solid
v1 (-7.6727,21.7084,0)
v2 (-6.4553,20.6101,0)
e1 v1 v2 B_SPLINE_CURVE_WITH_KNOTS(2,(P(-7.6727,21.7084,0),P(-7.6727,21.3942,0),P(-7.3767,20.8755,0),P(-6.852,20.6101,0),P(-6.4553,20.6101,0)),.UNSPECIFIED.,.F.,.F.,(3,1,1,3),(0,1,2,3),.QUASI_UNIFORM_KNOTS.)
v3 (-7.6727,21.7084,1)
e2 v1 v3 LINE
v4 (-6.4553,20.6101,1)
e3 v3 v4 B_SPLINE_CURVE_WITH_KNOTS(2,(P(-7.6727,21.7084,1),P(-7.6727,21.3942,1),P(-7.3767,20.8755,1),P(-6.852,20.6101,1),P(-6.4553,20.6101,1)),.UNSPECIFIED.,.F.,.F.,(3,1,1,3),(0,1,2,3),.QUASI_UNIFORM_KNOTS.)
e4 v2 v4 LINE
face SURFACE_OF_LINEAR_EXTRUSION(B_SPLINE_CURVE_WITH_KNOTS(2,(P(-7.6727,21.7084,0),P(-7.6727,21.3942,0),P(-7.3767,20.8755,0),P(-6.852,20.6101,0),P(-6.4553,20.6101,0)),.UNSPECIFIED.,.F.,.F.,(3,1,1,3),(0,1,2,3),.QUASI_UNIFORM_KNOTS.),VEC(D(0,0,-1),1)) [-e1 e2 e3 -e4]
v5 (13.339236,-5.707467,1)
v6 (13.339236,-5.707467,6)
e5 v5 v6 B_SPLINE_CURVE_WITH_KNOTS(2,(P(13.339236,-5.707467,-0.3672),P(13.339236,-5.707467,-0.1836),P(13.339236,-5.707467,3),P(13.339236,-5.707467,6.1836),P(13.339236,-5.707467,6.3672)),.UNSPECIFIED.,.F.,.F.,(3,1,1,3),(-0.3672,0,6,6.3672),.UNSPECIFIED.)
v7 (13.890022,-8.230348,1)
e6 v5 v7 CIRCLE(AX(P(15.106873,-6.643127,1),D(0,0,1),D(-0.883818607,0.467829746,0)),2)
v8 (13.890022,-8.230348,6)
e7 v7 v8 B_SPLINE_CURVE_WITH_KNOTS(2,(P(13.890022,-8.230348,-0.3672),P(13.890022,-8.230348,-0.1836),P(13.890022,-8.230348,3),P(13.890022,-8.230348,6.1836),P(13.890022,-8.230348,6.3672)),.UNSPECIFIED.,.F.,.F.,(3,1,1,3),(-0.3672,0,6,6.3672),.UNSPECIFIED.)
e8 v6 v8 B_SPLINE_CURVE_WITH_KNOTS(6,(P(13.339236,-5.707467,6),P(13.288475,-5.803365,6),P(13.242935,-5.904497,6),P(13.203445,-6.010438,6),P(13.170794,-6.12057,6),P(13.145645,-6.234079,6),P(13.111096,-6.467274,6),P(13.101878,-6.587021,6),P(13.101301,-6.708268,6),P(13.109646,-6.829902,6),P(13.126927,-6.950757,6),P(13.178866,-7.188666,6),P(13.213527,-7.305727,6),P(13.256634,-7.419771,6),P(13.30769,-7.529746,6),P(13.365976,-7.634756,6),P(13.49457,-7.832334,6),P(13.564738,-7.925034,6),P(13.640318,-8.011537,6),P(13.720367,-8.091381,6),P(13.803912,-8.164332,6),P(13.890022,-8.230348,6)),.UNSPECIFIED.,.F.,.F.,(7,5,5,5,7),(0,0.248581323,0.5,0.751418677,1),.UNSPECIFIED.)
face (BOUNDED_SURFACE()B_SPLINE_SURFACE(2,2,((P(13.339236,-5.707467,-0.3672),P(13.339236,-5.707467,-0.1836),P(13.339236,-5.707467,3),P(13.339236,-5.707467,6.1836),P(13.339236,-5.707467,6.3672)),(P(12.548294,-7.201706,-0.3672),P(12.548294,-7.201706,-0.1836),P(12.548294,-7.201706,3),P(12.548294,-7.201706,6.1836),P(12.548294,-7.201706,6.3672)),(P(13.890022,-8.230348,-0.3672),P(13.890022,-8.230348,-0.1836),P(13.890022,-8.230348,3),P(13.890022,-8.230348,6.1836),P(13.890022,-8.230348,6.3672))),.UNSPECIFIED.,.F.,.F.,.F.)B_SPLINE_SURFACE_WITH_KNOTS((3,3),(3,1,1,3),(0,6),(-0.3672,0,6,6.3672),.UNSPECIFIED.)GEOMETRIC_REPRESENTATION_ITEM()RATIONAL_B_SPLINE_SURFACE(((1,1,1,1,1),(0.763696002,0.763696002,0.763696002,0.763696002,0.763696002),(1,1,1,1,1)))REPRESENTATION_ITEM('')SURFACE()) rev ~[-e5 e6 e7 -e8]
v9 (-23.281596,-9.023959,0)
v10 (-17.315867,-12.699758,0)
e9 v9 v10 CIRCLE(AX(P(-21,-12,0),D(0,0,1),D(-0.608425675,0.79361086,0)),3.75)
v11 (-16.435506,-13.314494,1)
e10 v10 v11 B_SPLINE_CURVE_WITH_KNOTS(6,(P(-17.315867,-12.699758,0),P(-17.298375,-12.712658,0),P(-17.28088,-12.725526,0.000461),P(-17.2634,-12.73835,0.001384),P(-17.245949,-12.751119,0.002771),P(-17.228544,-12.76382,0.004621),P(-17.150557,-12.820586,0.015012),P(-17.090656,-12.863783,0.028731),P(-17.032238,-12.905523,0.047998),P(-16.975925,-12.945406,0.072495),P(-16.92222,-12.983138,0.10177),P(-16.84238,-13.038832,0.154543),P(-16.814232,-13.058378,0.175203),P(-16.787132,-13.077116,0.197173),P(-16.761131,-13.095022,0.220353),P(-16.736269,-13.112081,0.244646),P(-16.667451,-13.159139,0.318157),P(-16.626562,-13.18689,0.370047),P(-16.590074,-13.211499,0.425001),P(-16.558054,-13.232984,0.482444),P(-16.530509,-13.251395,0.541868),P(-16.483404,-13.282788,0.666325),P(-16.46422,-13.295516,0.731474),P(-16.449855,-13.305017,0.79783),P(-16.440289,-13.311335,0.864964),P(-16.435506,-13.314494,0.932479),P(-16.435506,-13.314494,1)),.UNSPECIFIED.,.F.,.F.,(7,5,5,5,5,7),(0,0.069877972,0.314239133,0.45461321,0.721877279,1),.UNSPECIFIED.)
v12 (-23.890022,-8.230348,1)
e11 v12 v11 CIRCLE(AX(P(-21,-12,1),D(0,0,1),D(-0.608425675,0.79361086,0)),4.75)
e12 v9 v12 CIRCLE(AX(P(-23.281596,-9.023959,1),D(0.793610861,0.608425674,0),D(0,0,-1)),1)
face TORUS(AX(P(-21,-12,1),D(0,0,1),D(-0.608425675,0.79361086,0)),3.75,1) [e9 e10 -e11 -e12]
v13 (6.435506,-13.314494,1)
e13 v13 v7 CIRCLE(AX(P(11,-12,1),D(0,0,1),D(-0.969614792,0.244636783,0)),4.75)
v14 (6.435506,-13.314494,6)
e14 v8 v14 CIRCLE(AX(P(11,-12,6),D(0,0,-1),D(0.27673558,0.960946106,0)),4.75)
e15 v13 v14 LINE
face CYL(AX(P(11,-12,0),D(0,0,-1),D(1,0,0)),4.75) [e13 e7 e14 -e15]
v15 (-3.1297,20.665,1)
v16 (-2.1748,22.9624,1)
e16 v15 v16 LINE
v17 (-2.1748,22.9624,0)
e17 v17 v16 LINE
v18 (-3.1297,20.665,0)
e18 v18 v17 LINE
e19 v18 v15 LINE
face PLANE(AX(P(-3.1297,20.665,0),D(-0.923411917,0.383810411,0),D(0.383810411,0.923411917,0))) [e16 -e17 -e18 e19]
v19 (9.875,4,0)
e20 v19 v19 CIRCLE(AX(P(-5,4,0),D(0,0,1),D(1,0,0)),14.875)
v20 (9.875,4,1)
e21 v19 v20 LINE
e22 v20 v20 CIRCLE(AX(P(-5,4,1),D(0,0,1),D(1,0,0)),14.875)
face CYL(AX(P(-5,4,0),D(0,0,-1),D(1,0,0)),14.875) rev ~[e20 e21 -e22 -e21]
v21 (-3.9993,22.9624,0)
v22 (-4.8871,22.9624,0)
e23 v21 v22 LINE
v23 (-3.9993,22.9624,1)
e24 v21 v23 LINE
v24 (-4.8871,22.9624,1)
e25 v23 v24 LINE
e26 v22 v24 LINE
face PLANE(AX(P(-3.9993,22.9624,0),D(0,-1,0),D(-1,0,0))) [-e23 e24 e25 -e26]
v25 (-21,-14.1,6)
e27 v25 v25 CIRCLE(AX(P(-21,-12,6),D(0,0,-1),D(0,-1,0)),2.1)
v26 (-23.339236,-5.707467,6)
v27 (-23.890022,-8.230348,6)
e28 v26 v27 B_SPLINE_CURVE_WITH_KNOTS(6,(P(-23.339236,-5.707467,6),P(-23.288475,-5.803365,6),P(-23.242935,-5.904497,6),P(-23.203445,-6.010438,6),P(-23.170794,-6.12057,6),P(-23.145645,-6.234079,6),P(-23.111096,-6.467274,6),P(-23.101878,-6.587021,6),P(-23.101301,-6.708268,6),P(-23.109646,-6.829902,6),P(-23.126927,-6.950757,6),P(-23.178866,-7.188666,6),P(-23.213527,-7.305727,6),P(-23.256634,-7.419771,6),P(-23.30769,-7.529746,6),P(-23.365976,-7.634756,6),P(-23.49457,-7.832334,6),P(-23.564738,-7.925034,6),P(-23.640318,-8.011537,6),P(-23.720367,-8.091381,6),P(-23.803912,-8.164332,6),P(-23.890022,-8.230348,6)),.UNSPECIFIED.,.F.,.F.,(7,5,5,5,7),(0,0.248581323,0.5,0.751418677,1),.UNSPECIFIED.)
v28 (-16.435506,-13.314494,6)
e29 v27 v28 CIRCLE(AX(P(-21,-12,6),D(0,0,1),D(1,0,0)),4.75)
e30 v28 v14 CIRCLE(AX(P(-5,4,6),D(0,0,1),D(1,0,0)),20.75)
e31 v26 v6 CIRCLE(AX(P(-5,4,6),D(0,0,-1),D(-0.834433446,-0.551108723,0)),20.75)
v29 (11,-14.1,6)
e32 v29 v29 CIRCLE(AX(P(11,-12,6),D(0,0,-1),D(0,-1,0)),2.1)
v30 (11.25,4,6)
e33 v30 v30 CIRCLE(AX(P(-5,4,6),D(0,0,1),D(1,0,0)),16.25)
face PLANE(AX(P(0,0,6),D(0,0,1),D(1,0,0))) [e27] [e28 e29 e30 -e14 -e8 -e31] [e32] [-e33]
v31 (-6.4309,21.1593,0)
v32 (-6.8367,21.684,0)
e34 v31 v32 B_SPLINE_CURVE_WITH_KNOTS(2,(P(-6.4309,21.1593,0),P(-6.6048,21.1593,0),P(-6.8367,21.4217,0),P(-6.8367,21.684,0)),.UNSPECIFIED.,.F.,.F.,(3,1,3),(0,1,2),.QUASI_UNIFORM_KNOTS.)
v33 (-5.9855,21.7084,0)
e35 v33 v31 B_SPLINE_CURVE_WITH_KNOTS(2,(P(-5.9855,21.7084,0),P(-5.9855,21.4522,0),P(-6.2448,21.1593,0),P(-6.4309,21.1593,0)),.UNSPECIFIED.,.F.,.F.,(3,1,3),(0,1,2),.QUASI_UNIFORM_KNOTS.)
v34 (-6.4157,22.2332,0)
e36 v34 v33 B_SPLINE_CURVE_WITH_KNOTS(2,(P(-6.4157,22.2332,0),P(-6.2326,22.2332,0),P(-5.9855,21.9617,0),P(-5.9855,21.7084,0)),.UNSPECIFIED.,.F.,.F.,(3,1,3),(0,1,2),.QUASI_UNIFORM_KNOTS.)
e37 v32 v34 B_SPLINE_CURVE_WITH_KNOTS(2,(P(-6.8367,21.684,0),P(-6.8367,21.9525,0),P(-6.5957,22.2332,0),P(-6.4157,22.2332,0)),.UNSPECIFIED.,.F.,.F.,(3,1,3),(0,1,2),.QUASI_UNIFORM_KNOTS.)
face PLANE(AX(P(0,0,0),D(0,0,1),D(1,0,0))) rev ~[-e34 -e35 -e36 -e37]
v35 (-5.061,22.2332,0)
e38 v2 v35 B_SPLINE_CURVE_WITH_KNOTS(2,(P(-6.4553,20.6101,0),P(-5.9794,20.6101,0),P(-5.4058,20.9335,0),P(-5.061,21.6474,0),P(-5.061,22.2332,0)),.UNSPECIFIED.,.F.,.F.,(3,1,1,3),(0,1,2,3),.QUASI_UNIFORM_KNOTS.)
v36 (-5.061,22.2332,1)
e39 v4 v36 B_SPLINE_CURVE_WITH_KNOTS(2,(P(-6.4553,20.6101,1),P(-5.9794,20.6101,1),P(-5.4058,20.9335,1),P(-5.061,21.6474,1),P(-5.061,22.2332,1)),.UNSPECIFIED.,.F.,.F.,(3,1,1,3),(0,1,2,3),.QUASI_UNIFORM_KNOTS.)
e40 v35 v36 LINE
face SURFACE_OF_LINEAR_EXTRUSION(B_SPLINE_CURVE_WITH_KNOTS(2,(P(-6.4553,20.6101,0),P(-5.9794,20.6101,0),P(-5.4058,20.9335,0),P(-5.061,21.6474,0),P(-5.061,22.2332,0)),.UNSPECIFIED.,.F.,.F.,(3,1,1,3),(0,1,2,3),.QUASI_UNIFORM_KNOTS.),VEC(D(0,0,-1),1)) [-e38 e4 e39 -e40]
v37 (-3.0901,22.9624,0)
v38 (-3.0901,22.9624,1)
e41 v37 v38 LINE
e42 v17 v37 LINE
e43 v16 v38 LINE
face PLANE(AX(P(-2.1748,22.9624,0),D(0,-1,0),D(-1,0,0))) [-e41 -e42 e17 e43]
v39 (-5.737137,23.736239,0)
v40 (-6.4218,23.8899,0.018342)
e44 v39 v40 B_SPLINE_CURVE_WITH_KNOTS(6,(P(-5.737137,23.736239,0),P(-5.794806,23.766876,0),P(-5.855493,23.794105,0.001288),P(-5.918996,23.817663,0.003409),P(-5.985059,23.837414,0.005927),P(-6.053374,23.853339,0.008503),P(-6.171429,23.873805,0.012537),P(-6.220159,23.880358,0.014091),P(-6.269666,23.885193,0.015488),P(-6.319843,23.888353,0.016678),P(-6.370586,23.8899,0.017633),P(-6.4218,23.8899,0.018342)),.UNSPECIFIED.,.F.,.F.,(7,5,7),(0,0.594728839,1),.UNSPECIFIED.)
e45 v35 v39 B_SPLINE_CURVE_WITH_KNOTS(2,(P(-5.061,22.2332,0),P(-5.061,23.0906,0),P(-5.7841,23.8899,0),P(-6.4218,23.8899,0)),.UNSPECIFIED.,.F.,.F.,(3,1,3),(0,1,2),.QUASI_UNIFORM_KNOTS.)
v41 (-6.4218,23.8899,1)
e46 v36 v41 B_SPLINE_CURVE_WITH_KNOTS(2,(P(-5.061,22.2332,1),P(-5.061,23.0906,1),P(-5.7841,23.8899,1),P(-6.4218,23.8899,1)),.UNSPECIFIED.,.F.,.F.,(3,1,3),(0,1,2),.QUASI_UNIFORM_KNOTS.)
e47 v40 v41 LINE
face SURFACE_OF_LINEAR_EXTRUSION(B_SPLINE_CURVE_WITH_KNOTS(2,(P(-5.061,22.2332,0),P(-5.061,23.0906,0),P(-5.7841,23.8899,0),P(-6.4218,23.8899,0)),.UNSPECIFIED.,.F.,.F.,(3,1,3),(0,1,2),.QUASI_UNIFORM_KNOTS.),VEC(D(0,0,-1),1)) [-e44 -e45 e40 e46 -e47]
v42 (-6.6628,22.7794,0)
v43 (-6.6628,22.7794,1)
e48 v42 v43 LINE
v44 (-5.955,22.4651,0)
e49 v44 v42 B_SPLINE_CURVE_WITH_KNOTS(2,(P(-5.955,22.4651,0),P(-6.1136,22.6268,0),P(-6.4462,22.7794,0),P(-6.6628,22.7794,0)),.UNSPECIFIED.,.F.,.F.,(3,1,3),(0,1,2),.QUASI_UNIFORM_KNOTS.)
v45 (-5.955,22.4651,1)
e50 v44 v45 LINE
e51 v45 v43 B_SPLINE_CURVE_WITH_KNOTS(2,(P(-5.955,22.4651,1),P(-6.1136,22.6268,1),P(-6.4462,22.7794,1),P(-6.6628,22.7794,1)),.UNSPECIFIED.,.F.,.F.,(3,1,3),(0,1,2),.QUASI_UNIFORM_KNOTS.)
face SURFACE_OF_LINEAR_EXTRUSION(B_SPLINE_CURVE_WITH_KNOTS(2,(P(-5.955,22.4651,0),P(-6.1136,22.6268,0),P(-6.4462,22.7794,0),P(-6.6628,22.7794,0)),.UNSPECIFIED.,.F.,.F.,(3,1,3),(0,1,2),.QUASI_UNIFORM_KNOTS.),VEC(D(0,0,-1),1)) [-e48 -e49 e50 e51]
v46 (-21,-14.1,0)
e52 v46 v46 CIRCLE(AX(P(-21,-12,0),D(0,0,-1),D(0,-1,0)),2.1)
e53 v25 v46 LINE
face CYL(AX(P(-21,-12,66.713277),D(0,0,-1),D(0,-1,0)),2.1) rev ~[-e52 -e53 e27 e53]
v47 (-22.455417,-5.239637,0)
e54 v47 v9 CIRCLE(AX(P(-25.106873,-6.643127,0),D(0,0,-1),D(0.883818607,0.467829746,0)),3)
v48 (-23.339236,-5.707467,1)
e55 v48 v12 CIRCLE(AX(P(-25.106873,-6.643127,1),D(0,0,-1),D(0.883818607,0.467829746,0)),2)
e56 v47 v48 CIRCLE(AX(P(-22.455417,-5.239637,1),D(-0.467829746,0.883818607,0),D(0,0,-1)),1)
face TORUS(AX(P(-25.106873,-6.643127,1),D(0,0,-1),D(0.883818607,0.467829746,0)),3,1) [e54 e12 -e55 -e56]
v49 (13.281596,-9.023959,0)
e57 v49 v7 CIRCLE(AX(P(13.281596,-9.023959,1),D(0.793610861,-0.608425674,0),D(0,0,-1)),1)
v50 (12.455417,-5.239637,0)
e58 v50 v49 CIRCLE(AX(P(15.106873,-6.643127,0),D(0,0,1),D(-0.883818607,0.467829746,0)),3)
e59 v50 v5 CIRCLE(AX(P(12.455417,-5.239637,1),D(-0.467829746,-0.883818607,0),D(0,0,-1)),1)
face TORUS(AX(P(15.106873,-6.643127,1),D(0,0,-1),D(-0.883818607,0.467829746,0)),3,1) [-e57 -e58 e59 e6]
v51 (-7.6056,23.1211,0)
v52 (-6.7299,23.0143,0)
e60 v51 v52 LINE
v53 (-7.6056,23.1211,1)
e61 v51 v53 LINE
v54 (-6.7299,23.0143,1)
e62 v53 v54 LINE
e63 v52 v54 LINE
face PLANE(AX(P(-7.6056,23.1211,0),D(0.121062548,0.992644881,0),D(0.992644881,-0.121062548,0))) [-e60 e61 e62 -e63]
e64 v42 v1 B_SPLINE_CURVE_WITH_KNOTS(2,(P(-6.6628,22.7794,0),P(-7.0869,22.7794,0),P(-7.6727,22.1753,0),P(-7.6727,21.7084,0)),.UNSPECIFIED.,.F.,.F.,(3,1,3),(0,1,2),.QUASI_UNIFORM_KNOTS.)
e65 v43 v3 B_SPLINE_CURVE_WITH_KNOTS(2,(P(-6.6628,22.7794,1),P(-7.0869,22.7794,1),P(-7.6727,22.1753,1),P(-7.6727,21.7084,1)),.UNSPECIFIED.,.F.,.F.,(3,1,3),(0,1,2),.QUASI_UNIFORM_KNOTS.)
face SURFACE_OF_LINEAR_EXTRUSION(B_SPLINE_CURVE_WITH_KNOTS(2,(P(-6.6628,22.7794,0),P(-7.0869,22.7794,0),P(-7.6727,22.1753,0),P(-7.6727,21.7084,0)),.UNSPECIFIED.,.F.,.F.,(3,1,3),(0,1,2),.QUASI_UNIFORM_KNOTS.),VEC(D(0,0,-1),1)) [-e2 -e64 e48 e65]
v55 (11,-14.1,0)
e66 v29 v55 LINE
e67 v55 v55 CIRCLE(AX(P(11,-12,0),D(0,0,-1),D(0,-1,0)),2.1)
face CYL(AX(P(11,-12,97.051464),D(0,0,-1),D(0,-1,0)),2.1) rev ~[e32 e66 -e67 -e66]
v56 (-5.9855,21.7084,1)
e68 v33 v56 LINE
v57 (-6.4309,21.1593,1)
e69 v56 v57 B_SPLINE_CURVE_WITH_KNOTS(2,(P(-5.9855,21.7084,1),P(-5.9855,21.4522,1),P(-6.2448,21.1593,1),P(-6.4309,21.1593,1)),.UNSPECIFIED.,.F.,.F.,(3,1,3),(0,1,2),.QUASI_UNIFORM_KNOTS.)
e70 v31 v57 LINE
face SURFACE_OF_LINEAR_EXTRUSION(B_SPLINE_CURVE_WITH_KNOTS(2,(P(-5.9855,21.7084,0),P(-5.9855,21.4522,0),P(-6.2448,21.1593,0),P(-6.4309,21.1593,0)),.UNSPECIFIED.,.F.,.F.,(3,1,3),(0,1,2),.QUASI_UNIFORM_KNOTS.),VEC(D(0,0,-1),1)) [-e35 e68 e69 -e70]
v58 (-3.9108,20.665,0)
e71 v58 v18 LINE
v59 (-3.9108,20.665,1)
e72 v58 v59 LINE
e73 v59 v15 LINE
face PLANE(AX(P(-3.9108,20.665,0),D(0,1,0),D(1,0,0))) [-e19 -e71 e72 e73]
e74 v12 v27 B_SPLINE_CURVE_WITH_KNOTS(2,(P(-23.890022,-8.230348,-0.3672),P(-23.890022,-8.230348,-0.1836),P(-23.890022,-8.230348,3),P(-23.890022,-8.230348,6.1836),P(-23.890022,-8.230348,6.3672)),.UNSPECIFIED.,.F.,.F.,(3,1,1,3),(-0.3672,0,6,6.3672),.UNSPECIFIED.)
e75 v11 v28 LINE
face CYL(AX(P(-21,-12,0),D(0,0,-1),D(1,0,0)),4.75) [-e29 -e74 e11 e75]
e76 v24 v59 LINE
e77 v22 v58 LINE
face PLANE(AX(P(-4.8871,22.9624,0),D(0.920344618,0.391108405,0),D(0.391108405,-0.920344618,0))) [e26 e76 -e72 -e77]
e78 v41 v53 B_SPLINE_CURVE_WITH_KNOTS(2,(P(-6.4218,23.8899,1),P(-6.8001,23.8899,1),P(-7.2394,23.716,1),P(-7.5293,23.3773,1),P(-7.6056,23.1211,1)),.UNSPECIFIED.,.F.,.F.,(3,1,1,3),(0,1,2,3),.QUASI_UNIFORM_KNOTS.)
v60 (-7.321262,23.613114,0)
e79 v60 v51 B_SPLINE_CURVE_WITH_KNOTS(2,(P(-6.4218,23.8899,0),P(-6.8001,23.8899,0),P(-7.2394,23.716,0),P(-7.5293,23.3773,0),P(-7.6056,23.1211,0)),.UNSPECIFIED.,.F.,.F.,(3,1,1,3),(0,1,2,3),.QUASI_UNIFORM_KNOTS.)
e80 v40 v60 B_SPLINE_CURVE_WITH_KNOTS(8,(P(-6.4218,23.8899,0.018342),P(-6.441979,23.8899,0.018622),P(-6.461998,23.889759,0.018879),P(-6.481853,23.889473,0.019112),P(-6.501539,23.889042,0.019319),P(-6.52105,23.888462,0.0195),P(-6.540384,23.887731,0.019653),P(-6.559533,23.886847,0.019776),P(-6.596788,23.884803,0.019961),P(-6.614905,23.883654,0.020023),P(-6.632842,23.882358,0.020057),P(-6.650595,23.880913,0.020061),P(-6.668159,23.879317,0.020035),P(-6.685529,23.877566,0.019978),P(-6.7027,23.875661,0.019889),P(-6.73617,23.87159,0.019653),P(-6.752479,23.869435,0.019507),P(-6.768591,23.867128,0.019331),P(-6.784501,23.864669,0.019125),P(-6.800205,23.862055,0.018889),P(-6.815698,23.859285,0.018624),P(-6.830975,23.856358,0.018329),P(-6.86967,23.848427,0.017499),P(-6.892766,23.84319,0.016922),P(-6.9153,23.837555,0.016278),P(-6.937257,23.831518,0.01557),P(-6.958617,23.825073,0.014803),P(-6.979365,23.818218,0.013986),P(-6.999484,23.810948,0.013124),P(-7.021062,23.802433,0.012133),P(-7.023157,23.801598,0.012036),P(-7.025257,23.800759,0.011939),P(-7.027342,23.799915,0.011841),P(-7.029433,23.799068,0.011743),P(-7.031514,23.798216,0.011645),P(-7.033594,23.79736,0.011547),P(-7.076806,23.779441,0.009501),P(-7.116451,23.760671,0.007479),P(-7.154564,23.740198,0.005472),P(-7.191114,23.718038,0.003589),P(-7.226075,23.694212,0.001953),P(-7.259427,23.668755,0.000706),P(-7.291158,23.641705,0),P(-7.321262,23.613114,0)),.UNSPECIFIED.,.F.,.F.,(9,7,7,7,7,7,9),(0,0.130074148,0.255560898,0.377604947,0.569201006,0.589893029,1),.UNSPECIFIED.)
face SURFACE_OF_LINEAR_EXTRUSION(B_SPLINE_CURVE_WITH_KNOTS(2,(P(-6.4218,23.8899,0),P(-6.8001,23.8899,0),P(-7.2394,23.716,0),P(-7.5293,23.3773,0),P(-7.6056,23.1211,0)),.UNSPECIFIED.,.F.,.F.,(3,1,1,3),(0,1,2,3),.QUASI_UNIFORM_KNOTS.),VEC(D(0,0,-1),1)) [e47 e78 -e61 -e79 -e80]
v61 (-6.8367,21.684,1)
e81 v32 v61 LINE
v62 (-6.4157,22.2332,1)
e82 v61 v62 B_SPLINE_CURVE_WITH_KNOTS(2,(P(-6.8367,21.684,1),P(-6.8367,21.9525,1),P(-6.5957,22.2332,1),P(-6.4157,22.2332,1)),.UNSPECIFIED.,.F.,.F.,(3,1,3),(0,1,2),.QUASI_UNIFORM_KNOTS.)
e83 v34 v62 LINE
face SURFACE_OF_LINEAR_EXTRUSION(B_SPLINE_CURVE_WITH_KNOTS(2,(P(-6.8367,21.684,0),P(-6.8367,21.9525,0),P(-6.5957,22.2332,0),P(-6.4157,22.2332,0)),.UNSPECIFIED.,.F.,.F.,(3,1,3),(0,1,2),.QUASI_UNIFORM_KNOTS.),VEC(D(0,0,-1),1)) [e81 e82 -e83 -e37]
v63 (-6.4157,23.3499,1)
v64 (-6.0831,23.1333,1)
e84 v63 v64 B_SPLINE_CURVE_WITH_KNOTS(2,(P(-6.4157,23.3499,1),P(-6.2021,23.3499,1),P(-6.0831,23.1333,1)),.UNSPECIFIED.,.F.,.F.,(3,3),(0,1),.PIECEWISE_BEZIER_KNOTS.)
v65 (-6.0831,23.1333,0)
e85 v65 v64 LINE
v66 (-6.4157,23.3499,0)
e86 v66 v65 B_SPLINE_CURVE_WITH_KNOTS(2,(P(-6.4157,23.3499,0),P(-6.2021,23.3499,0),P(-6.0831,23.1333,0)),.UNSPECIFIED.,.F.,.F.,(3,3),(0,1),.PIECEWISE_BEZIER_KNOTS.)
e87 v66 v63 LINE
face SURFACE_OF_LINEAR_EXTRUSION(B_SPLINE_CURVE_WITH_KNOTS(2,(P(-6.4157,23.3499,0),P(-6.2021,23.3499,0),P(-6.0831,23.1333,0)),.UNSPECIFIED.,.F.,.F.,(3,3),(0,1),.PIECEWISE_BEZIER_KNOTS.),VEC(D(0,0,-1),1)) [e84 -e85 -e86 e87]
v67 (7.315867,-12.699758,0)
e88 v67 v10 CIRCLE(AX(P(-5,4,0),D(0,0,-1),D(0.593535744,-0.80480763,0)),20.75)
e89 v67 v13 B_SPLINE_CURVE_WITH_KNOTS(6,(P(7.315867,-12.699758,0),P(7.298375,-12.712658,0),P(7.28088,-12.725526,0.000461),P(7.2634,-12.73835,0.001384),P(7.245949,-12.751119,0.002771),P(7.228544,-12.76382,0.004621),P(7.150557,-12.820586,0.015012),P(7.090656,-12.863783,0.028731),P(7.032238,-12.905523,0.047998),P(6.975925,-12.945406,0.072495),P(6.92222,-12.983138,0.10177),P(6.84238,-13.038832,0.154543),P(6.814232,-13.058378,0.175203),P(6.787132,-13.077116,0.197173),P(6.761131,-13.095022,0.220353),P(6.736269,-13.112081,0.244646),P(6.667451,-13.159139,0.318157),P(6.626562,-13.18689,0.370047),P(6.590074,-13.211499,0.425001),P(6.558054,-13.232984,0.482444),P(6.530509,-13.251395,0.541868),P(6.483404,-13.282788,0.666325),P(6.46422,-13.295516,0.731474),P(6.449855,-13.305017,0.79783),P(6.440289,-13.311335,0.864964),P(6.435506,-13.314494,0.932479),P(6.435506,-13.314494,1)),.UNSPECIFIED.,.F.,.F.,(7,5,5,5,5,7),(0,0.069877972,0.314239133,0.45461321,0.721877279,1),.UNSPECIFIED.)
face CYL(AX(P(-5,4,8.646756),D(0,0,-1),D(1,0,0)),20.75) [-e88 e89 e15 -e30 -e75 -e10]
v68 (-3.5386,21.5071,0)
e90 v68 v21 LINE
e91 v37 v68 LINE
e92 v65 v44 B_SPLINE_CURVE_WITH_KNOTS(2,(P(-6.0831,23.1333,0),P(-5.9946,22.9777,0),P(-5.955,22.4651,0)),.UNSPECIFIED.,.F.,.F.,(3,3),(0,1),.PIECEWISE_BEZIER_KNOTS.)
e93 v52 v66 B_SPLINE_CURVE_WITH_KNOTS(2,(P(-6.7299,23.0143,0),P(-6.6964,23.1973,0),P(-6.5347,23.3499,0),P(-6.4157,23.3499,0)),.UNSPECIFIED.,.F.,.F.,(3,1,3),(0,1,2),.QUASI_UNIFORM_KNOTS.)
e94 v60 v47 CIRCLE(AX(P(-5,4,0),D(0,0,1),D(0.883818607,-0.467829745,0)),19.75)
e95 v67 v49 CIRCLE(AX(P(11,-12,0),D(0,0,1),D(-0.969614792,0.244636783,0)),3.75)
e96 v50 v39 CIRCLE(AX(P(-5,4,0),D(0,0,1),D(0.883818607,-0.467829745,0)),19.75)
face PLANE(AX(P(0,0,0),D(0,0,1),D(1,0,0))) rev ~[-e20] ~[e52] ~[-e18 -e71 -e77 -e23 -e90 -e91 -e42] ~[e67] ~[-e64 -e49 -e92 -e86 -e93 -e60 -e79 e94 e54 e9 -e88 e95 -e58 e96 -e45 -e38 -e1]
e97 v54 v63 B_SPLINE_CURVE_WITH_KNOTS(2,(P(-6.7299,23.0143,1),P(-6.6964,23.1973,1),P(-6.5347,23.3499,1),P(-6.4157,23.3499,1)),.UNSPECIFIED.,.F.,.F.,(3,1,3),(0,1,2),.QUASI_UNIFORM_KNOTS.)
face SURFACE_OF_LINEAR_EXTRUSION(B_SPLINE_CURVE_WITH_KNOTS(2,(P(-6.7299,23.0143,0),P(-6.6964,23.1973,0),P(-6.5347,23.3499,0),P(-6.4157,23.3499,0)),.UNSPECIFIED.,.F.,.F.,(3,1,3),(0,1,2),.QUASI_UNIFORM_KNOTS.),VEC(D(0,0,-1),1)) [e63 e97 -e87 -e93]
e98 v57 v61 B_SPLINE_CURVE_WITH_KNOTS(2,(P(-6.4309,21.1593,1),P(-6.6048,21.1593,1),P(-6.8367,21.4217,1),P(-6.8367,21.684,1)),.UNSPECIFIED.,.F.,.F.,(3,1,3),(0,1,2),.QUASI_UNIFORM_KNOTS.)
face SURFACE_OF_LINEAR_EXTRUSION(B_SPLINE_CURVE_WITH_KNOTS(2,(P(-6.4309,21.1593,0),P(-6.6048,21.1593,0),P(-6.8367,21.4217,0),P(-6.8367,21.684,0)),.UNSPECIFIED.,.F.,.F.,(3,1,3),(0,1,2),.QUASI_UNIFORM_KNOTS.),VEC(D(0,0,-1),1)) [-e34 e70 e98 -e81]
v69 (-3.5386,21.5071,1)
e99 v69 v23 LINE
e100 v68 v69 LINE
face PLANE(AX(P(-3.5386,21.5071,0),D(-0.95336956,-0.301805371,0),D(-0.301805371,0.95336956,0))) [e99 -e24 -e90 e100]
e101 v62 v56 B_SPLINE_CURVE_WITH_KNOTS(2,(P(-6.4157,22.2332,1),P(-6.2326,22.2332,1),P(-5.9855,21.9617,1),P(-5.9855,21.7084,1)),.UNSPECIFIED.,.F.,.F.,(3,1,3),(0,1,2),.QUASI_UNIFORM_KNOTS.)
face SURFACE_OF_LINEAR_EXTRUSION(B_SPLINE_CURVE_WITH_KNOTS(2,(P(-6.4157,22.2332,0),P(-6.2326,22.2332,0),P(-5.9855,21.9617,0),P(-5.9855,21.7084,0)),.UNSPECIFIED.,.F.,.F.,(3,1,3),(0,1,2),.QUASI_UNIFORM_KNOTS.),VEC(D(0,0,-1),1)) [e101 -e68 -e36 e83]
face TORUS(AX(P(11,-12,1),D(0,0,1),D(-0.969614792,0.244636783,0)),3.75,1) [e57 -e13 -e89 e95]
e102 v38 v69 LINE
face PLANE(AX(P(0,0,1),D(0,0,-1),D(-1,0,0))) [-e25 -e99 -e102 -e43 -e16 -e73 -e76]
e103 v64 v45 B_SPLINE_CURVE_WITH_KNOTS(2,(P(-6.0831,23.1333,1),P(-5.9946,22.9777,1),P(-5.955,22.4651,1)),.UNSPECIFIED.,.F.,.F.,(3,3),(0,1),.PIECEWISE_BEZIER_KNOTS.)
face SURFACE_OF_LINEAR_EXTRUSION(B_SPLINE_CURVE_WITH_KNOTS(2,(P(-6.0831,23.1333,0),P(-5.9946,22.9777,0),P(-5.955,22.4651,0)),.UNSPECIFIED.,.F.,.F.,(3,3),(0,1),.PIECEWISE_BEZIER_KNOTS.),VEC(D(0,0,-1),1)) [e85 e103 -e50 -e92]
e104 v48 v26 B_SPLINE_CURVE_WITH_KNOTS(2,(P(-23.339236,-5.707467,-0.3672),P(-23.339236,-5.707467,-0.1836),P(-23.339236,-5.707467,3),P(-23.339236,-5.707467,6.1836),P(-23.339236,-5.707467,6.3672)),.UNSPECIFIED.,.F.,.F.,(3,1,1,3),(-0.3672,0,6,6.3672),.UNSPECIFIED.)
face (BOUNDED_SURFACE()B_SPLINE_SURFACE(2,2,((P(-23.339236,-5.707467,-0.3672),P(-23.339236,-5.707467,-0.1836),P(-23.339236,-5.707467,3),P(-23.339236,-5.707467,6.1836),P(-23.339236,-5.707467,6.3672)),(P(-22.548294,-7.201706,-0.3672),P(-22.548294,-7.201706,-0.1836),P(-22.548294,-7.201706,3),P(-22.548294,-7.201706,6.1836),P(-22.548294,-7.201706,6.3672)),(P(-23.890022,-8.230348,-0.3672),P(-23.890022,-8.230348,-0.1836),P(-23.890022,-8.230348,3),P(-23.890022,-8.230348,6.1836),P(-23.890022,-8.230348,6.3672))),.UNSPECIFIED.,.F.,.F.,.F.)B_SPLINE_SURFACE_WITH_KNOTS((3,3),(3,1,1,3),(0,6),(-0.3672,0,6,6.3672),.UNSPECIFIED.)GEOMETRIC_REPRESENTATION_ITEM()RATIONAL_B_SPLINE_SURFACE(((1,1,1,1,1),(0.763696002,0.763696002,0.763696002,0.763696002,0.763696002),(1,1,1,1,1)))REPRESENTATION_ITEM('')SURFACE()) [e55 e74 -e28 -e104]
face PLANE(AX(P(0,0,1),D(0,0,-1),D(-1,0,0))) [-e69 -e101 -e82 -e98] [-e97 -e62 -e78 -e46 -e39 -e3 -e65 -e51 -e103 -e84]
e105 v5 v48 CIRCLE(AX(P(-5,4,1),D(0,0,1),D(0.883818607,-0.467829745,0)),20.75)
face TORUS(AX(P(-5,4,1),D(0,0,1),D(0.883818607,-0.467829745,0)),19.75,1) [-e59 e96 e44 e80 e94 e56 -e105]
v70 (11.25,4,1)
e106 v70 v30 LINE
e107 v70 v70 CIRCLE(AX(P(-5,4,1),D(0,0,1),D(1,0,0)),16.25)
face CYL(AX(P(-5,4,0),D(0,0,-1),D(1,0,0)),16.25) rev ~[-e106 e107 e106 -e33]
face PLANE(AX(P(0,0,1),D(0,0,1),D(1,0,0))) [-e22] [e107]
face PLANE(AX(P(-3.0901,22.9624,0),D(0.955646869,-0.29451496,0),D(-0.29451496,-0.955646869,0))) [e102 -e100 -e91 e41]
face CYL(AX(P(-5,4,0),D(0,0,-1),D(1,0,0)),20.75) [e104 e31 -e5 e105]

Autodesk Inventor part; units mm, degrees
ref_plane "YZ Plane" through (0, 0, 0) normal (1, 0, 0) x (0, 1, 0)
ref_plane "XZ Plane" through (0, 0, 0) normal (0, 1, 0) x (-1, 0, 0)
sketch "Sketch1: base" plane through (0, 0, 0) normal (0, 0, 1) x (1, 0, 0)
  circle A0 centre (-5, 4) radius 16.25
  circle A1 centre (-5, 4) radius 20.75
  circle A2 centre (-21, -12) radius 4.75
  circle A3 centre (11, -12) radius 4.75
  line L0 (-21, -12) -> (11, -12) construction
  line L1 (-21, 20) -> (-21, -12) construction
  point P0 (0, 0)
  point P1 (-5, -12)
  point P2 (-21, 4)
  point P3 (-22.3145, -7.4355)
  point P4 (-16.4355, -13.3145)
  point P5 (6.4355, -13.3145)
  point P6 (12.3145, -7.4355)
  dimension "d0" = 9.5
  dimension "d1" = 32
  dimension "d2" = 41.5
  dimension "d3" = 32.5
  dimension "d4" = 32
sketch "Sketch2: tube stopper" plane through (0, 0, 0) normal (0, 0, 1) x (1, 0, 0)
  circle A0 centre (-5, 4) radius 14.875
  circle A1 centre (-5, 4) radius 16.25 projected
  point P0 (0, 0)
  dimension "d14" = 29.75
extrude "Ex1: base" add sketch "Sketch1: base" along normal blind 6
ref_plane "Work Plane1" through (0, 0, 0) normal (0, 0, 1) x (1, 0, 0)
sketch "Sketch: text" plane through (0, 0, 0) normal (0, 0, -1) x (-1, 0, 0)
  line L0 (3.25, 24) -> (6.75, 24) construction
  line L1 (6.75, 24) -> (6.75, 20.5) construction
  line L2 (6.75, 20.5) -> (3.25, 20.5) construction
  line L3 (3.25, 20.5) -> (3.25, 24) construction
  line L4 (2.1748, 22.9624) -> (3.0901, 22.9624)
  line L5 (3.0901, 22.9624) -> (3.5386, 21.5071)
  line L6 (3.5386, 21.5071) -> (3.9993, 22.9624)
  line L7 (3.9993, 22.9624) -> (4.8871, 22.9624)
  line L8 (4.8871, 22.9624) -> (3.9108, 20.665)
  line L9 (3.9108, 20.665) -> (3.1297, 20.665)
  line L10 (3.1297, 20.665) -> (2.1748, 22.9624)
  line L11 (7.6056, 23.1211) -> (6.7299, 23.0143)
  spline S0 degree 2 poles (6.7299, 23.0143) (6.6964, 23.1973) (6.5347, 23.3499) (6.4157, 23.3499) knots 0 0 0 1 2 2 2
  spline S1 degree 2 poles (6.4157, 23.3499) (6.2021, 23.3499) (6.0831, 23.1333) knots 0 0 0 1 1 1
  spline S2 degree 2 poles (6.0831, 23.1333) (5.9946, 22.9777) (5.955, 22.4651) knots 0 0 0 1 1 1
  spline S3 degree 2 poles (5.955, 22.4651) (6.1136, 22.6268) (6.4462, 22.7794) (6.6628, 22.7794) knots 0 0 0 1 2 2 2
  spline S4 degree 2 poles (6.6628, 22.7794) (7.0869, 22.7794) (7.6727, 22.1753) (7.6727, 21.7084) knots 0 0 0 1 2 2 2
  spline S5 degree 2 poles (7.6727, 21.7084) (7.6727, 21.3942) (7.3767, 20.8755) (6.852, 20.6101) (6.4553, 20.6101) knots 0 0 0 1 2 3 3 3
  spline S6 degree 2 poles (6.4553, 20.6101) (5.9794, 20.6101) (5.4058, 20.9335) (5.061, 21.6474) (5.061, 22.2332) knots 0 0 0 1 2 3 3 3
  spline S7 degree 2 poles (5.061, 22.2332) (5.061, 23.0906) (5.7841, 23.8899) (6.4218, 23.8899) knots 0 0 0 1 2 2 2
  spline S8 degree 2 poles (6.4218, 23.8899) (6.8001, 23.8899) (7.2394, 23.716) (7.5293, 23.3773) (7.6056, 23.1211) knots 0 0 0 1 2 3 3 3
  spline S9 degree 2 poles (5.9855, 21.7084) (5.9855, 21.4522) (6.2448, 21.1593) (6.4309, 21.1593) knots 0 0 0 1 2 2 2
  spline S10 degree 2 poles (6.4309, 21.1593) (6.6048, 21.1593) (6.8367, 21.4217) (6.8367, 21.684) knots 0 0 0 1 2 2 2
  spline S11 degree 2 poles (6.8367, 21.684) (6.8367, 21.9525) (6.5957, 22.2332) (6.4157, 22.2332) knots 0 0 0 1 2 2 2
  spline S12 degree 2 poles (6.4157, 22.2332) (6.2326, 22.2332) (5.9855, 21.9617) (5.9855, 21.7084) knots 0 0 0 1 2 2 2
  point P0 (0, 0)
  point P1 (5, 4)
  point P2 (5, 20.5)
  dimension "d22" = 3.5
  dimension "d23" = 16.5
hole "Hole1: M3 heat-sets" at (11, -12, 0) at (-21, -12, 0) direction (0, 0, -1) diameter 4.2 end through all both
extrude "Ex: tube stopper" add sketch "Sketch2: tube stopper" along normal blind 1
fillet "Fillet1" radius 2 2 edges at (12.3145, -7.4355, 3) (-22.3145, -7.4355, 3)
fillet "Fillet2" radius 1 5 edges at (-23.1529, -7.0697, 0) (-23.6764, -15.9242, 0) (13.1529, -7.0697, 0) (13.6764, -15.9242, 0) (-5, 24.75, 0)
extrude "Ex: text" cut sketch "Sketch: text" against normal blind 1
properties part number "cage_inside_06"
